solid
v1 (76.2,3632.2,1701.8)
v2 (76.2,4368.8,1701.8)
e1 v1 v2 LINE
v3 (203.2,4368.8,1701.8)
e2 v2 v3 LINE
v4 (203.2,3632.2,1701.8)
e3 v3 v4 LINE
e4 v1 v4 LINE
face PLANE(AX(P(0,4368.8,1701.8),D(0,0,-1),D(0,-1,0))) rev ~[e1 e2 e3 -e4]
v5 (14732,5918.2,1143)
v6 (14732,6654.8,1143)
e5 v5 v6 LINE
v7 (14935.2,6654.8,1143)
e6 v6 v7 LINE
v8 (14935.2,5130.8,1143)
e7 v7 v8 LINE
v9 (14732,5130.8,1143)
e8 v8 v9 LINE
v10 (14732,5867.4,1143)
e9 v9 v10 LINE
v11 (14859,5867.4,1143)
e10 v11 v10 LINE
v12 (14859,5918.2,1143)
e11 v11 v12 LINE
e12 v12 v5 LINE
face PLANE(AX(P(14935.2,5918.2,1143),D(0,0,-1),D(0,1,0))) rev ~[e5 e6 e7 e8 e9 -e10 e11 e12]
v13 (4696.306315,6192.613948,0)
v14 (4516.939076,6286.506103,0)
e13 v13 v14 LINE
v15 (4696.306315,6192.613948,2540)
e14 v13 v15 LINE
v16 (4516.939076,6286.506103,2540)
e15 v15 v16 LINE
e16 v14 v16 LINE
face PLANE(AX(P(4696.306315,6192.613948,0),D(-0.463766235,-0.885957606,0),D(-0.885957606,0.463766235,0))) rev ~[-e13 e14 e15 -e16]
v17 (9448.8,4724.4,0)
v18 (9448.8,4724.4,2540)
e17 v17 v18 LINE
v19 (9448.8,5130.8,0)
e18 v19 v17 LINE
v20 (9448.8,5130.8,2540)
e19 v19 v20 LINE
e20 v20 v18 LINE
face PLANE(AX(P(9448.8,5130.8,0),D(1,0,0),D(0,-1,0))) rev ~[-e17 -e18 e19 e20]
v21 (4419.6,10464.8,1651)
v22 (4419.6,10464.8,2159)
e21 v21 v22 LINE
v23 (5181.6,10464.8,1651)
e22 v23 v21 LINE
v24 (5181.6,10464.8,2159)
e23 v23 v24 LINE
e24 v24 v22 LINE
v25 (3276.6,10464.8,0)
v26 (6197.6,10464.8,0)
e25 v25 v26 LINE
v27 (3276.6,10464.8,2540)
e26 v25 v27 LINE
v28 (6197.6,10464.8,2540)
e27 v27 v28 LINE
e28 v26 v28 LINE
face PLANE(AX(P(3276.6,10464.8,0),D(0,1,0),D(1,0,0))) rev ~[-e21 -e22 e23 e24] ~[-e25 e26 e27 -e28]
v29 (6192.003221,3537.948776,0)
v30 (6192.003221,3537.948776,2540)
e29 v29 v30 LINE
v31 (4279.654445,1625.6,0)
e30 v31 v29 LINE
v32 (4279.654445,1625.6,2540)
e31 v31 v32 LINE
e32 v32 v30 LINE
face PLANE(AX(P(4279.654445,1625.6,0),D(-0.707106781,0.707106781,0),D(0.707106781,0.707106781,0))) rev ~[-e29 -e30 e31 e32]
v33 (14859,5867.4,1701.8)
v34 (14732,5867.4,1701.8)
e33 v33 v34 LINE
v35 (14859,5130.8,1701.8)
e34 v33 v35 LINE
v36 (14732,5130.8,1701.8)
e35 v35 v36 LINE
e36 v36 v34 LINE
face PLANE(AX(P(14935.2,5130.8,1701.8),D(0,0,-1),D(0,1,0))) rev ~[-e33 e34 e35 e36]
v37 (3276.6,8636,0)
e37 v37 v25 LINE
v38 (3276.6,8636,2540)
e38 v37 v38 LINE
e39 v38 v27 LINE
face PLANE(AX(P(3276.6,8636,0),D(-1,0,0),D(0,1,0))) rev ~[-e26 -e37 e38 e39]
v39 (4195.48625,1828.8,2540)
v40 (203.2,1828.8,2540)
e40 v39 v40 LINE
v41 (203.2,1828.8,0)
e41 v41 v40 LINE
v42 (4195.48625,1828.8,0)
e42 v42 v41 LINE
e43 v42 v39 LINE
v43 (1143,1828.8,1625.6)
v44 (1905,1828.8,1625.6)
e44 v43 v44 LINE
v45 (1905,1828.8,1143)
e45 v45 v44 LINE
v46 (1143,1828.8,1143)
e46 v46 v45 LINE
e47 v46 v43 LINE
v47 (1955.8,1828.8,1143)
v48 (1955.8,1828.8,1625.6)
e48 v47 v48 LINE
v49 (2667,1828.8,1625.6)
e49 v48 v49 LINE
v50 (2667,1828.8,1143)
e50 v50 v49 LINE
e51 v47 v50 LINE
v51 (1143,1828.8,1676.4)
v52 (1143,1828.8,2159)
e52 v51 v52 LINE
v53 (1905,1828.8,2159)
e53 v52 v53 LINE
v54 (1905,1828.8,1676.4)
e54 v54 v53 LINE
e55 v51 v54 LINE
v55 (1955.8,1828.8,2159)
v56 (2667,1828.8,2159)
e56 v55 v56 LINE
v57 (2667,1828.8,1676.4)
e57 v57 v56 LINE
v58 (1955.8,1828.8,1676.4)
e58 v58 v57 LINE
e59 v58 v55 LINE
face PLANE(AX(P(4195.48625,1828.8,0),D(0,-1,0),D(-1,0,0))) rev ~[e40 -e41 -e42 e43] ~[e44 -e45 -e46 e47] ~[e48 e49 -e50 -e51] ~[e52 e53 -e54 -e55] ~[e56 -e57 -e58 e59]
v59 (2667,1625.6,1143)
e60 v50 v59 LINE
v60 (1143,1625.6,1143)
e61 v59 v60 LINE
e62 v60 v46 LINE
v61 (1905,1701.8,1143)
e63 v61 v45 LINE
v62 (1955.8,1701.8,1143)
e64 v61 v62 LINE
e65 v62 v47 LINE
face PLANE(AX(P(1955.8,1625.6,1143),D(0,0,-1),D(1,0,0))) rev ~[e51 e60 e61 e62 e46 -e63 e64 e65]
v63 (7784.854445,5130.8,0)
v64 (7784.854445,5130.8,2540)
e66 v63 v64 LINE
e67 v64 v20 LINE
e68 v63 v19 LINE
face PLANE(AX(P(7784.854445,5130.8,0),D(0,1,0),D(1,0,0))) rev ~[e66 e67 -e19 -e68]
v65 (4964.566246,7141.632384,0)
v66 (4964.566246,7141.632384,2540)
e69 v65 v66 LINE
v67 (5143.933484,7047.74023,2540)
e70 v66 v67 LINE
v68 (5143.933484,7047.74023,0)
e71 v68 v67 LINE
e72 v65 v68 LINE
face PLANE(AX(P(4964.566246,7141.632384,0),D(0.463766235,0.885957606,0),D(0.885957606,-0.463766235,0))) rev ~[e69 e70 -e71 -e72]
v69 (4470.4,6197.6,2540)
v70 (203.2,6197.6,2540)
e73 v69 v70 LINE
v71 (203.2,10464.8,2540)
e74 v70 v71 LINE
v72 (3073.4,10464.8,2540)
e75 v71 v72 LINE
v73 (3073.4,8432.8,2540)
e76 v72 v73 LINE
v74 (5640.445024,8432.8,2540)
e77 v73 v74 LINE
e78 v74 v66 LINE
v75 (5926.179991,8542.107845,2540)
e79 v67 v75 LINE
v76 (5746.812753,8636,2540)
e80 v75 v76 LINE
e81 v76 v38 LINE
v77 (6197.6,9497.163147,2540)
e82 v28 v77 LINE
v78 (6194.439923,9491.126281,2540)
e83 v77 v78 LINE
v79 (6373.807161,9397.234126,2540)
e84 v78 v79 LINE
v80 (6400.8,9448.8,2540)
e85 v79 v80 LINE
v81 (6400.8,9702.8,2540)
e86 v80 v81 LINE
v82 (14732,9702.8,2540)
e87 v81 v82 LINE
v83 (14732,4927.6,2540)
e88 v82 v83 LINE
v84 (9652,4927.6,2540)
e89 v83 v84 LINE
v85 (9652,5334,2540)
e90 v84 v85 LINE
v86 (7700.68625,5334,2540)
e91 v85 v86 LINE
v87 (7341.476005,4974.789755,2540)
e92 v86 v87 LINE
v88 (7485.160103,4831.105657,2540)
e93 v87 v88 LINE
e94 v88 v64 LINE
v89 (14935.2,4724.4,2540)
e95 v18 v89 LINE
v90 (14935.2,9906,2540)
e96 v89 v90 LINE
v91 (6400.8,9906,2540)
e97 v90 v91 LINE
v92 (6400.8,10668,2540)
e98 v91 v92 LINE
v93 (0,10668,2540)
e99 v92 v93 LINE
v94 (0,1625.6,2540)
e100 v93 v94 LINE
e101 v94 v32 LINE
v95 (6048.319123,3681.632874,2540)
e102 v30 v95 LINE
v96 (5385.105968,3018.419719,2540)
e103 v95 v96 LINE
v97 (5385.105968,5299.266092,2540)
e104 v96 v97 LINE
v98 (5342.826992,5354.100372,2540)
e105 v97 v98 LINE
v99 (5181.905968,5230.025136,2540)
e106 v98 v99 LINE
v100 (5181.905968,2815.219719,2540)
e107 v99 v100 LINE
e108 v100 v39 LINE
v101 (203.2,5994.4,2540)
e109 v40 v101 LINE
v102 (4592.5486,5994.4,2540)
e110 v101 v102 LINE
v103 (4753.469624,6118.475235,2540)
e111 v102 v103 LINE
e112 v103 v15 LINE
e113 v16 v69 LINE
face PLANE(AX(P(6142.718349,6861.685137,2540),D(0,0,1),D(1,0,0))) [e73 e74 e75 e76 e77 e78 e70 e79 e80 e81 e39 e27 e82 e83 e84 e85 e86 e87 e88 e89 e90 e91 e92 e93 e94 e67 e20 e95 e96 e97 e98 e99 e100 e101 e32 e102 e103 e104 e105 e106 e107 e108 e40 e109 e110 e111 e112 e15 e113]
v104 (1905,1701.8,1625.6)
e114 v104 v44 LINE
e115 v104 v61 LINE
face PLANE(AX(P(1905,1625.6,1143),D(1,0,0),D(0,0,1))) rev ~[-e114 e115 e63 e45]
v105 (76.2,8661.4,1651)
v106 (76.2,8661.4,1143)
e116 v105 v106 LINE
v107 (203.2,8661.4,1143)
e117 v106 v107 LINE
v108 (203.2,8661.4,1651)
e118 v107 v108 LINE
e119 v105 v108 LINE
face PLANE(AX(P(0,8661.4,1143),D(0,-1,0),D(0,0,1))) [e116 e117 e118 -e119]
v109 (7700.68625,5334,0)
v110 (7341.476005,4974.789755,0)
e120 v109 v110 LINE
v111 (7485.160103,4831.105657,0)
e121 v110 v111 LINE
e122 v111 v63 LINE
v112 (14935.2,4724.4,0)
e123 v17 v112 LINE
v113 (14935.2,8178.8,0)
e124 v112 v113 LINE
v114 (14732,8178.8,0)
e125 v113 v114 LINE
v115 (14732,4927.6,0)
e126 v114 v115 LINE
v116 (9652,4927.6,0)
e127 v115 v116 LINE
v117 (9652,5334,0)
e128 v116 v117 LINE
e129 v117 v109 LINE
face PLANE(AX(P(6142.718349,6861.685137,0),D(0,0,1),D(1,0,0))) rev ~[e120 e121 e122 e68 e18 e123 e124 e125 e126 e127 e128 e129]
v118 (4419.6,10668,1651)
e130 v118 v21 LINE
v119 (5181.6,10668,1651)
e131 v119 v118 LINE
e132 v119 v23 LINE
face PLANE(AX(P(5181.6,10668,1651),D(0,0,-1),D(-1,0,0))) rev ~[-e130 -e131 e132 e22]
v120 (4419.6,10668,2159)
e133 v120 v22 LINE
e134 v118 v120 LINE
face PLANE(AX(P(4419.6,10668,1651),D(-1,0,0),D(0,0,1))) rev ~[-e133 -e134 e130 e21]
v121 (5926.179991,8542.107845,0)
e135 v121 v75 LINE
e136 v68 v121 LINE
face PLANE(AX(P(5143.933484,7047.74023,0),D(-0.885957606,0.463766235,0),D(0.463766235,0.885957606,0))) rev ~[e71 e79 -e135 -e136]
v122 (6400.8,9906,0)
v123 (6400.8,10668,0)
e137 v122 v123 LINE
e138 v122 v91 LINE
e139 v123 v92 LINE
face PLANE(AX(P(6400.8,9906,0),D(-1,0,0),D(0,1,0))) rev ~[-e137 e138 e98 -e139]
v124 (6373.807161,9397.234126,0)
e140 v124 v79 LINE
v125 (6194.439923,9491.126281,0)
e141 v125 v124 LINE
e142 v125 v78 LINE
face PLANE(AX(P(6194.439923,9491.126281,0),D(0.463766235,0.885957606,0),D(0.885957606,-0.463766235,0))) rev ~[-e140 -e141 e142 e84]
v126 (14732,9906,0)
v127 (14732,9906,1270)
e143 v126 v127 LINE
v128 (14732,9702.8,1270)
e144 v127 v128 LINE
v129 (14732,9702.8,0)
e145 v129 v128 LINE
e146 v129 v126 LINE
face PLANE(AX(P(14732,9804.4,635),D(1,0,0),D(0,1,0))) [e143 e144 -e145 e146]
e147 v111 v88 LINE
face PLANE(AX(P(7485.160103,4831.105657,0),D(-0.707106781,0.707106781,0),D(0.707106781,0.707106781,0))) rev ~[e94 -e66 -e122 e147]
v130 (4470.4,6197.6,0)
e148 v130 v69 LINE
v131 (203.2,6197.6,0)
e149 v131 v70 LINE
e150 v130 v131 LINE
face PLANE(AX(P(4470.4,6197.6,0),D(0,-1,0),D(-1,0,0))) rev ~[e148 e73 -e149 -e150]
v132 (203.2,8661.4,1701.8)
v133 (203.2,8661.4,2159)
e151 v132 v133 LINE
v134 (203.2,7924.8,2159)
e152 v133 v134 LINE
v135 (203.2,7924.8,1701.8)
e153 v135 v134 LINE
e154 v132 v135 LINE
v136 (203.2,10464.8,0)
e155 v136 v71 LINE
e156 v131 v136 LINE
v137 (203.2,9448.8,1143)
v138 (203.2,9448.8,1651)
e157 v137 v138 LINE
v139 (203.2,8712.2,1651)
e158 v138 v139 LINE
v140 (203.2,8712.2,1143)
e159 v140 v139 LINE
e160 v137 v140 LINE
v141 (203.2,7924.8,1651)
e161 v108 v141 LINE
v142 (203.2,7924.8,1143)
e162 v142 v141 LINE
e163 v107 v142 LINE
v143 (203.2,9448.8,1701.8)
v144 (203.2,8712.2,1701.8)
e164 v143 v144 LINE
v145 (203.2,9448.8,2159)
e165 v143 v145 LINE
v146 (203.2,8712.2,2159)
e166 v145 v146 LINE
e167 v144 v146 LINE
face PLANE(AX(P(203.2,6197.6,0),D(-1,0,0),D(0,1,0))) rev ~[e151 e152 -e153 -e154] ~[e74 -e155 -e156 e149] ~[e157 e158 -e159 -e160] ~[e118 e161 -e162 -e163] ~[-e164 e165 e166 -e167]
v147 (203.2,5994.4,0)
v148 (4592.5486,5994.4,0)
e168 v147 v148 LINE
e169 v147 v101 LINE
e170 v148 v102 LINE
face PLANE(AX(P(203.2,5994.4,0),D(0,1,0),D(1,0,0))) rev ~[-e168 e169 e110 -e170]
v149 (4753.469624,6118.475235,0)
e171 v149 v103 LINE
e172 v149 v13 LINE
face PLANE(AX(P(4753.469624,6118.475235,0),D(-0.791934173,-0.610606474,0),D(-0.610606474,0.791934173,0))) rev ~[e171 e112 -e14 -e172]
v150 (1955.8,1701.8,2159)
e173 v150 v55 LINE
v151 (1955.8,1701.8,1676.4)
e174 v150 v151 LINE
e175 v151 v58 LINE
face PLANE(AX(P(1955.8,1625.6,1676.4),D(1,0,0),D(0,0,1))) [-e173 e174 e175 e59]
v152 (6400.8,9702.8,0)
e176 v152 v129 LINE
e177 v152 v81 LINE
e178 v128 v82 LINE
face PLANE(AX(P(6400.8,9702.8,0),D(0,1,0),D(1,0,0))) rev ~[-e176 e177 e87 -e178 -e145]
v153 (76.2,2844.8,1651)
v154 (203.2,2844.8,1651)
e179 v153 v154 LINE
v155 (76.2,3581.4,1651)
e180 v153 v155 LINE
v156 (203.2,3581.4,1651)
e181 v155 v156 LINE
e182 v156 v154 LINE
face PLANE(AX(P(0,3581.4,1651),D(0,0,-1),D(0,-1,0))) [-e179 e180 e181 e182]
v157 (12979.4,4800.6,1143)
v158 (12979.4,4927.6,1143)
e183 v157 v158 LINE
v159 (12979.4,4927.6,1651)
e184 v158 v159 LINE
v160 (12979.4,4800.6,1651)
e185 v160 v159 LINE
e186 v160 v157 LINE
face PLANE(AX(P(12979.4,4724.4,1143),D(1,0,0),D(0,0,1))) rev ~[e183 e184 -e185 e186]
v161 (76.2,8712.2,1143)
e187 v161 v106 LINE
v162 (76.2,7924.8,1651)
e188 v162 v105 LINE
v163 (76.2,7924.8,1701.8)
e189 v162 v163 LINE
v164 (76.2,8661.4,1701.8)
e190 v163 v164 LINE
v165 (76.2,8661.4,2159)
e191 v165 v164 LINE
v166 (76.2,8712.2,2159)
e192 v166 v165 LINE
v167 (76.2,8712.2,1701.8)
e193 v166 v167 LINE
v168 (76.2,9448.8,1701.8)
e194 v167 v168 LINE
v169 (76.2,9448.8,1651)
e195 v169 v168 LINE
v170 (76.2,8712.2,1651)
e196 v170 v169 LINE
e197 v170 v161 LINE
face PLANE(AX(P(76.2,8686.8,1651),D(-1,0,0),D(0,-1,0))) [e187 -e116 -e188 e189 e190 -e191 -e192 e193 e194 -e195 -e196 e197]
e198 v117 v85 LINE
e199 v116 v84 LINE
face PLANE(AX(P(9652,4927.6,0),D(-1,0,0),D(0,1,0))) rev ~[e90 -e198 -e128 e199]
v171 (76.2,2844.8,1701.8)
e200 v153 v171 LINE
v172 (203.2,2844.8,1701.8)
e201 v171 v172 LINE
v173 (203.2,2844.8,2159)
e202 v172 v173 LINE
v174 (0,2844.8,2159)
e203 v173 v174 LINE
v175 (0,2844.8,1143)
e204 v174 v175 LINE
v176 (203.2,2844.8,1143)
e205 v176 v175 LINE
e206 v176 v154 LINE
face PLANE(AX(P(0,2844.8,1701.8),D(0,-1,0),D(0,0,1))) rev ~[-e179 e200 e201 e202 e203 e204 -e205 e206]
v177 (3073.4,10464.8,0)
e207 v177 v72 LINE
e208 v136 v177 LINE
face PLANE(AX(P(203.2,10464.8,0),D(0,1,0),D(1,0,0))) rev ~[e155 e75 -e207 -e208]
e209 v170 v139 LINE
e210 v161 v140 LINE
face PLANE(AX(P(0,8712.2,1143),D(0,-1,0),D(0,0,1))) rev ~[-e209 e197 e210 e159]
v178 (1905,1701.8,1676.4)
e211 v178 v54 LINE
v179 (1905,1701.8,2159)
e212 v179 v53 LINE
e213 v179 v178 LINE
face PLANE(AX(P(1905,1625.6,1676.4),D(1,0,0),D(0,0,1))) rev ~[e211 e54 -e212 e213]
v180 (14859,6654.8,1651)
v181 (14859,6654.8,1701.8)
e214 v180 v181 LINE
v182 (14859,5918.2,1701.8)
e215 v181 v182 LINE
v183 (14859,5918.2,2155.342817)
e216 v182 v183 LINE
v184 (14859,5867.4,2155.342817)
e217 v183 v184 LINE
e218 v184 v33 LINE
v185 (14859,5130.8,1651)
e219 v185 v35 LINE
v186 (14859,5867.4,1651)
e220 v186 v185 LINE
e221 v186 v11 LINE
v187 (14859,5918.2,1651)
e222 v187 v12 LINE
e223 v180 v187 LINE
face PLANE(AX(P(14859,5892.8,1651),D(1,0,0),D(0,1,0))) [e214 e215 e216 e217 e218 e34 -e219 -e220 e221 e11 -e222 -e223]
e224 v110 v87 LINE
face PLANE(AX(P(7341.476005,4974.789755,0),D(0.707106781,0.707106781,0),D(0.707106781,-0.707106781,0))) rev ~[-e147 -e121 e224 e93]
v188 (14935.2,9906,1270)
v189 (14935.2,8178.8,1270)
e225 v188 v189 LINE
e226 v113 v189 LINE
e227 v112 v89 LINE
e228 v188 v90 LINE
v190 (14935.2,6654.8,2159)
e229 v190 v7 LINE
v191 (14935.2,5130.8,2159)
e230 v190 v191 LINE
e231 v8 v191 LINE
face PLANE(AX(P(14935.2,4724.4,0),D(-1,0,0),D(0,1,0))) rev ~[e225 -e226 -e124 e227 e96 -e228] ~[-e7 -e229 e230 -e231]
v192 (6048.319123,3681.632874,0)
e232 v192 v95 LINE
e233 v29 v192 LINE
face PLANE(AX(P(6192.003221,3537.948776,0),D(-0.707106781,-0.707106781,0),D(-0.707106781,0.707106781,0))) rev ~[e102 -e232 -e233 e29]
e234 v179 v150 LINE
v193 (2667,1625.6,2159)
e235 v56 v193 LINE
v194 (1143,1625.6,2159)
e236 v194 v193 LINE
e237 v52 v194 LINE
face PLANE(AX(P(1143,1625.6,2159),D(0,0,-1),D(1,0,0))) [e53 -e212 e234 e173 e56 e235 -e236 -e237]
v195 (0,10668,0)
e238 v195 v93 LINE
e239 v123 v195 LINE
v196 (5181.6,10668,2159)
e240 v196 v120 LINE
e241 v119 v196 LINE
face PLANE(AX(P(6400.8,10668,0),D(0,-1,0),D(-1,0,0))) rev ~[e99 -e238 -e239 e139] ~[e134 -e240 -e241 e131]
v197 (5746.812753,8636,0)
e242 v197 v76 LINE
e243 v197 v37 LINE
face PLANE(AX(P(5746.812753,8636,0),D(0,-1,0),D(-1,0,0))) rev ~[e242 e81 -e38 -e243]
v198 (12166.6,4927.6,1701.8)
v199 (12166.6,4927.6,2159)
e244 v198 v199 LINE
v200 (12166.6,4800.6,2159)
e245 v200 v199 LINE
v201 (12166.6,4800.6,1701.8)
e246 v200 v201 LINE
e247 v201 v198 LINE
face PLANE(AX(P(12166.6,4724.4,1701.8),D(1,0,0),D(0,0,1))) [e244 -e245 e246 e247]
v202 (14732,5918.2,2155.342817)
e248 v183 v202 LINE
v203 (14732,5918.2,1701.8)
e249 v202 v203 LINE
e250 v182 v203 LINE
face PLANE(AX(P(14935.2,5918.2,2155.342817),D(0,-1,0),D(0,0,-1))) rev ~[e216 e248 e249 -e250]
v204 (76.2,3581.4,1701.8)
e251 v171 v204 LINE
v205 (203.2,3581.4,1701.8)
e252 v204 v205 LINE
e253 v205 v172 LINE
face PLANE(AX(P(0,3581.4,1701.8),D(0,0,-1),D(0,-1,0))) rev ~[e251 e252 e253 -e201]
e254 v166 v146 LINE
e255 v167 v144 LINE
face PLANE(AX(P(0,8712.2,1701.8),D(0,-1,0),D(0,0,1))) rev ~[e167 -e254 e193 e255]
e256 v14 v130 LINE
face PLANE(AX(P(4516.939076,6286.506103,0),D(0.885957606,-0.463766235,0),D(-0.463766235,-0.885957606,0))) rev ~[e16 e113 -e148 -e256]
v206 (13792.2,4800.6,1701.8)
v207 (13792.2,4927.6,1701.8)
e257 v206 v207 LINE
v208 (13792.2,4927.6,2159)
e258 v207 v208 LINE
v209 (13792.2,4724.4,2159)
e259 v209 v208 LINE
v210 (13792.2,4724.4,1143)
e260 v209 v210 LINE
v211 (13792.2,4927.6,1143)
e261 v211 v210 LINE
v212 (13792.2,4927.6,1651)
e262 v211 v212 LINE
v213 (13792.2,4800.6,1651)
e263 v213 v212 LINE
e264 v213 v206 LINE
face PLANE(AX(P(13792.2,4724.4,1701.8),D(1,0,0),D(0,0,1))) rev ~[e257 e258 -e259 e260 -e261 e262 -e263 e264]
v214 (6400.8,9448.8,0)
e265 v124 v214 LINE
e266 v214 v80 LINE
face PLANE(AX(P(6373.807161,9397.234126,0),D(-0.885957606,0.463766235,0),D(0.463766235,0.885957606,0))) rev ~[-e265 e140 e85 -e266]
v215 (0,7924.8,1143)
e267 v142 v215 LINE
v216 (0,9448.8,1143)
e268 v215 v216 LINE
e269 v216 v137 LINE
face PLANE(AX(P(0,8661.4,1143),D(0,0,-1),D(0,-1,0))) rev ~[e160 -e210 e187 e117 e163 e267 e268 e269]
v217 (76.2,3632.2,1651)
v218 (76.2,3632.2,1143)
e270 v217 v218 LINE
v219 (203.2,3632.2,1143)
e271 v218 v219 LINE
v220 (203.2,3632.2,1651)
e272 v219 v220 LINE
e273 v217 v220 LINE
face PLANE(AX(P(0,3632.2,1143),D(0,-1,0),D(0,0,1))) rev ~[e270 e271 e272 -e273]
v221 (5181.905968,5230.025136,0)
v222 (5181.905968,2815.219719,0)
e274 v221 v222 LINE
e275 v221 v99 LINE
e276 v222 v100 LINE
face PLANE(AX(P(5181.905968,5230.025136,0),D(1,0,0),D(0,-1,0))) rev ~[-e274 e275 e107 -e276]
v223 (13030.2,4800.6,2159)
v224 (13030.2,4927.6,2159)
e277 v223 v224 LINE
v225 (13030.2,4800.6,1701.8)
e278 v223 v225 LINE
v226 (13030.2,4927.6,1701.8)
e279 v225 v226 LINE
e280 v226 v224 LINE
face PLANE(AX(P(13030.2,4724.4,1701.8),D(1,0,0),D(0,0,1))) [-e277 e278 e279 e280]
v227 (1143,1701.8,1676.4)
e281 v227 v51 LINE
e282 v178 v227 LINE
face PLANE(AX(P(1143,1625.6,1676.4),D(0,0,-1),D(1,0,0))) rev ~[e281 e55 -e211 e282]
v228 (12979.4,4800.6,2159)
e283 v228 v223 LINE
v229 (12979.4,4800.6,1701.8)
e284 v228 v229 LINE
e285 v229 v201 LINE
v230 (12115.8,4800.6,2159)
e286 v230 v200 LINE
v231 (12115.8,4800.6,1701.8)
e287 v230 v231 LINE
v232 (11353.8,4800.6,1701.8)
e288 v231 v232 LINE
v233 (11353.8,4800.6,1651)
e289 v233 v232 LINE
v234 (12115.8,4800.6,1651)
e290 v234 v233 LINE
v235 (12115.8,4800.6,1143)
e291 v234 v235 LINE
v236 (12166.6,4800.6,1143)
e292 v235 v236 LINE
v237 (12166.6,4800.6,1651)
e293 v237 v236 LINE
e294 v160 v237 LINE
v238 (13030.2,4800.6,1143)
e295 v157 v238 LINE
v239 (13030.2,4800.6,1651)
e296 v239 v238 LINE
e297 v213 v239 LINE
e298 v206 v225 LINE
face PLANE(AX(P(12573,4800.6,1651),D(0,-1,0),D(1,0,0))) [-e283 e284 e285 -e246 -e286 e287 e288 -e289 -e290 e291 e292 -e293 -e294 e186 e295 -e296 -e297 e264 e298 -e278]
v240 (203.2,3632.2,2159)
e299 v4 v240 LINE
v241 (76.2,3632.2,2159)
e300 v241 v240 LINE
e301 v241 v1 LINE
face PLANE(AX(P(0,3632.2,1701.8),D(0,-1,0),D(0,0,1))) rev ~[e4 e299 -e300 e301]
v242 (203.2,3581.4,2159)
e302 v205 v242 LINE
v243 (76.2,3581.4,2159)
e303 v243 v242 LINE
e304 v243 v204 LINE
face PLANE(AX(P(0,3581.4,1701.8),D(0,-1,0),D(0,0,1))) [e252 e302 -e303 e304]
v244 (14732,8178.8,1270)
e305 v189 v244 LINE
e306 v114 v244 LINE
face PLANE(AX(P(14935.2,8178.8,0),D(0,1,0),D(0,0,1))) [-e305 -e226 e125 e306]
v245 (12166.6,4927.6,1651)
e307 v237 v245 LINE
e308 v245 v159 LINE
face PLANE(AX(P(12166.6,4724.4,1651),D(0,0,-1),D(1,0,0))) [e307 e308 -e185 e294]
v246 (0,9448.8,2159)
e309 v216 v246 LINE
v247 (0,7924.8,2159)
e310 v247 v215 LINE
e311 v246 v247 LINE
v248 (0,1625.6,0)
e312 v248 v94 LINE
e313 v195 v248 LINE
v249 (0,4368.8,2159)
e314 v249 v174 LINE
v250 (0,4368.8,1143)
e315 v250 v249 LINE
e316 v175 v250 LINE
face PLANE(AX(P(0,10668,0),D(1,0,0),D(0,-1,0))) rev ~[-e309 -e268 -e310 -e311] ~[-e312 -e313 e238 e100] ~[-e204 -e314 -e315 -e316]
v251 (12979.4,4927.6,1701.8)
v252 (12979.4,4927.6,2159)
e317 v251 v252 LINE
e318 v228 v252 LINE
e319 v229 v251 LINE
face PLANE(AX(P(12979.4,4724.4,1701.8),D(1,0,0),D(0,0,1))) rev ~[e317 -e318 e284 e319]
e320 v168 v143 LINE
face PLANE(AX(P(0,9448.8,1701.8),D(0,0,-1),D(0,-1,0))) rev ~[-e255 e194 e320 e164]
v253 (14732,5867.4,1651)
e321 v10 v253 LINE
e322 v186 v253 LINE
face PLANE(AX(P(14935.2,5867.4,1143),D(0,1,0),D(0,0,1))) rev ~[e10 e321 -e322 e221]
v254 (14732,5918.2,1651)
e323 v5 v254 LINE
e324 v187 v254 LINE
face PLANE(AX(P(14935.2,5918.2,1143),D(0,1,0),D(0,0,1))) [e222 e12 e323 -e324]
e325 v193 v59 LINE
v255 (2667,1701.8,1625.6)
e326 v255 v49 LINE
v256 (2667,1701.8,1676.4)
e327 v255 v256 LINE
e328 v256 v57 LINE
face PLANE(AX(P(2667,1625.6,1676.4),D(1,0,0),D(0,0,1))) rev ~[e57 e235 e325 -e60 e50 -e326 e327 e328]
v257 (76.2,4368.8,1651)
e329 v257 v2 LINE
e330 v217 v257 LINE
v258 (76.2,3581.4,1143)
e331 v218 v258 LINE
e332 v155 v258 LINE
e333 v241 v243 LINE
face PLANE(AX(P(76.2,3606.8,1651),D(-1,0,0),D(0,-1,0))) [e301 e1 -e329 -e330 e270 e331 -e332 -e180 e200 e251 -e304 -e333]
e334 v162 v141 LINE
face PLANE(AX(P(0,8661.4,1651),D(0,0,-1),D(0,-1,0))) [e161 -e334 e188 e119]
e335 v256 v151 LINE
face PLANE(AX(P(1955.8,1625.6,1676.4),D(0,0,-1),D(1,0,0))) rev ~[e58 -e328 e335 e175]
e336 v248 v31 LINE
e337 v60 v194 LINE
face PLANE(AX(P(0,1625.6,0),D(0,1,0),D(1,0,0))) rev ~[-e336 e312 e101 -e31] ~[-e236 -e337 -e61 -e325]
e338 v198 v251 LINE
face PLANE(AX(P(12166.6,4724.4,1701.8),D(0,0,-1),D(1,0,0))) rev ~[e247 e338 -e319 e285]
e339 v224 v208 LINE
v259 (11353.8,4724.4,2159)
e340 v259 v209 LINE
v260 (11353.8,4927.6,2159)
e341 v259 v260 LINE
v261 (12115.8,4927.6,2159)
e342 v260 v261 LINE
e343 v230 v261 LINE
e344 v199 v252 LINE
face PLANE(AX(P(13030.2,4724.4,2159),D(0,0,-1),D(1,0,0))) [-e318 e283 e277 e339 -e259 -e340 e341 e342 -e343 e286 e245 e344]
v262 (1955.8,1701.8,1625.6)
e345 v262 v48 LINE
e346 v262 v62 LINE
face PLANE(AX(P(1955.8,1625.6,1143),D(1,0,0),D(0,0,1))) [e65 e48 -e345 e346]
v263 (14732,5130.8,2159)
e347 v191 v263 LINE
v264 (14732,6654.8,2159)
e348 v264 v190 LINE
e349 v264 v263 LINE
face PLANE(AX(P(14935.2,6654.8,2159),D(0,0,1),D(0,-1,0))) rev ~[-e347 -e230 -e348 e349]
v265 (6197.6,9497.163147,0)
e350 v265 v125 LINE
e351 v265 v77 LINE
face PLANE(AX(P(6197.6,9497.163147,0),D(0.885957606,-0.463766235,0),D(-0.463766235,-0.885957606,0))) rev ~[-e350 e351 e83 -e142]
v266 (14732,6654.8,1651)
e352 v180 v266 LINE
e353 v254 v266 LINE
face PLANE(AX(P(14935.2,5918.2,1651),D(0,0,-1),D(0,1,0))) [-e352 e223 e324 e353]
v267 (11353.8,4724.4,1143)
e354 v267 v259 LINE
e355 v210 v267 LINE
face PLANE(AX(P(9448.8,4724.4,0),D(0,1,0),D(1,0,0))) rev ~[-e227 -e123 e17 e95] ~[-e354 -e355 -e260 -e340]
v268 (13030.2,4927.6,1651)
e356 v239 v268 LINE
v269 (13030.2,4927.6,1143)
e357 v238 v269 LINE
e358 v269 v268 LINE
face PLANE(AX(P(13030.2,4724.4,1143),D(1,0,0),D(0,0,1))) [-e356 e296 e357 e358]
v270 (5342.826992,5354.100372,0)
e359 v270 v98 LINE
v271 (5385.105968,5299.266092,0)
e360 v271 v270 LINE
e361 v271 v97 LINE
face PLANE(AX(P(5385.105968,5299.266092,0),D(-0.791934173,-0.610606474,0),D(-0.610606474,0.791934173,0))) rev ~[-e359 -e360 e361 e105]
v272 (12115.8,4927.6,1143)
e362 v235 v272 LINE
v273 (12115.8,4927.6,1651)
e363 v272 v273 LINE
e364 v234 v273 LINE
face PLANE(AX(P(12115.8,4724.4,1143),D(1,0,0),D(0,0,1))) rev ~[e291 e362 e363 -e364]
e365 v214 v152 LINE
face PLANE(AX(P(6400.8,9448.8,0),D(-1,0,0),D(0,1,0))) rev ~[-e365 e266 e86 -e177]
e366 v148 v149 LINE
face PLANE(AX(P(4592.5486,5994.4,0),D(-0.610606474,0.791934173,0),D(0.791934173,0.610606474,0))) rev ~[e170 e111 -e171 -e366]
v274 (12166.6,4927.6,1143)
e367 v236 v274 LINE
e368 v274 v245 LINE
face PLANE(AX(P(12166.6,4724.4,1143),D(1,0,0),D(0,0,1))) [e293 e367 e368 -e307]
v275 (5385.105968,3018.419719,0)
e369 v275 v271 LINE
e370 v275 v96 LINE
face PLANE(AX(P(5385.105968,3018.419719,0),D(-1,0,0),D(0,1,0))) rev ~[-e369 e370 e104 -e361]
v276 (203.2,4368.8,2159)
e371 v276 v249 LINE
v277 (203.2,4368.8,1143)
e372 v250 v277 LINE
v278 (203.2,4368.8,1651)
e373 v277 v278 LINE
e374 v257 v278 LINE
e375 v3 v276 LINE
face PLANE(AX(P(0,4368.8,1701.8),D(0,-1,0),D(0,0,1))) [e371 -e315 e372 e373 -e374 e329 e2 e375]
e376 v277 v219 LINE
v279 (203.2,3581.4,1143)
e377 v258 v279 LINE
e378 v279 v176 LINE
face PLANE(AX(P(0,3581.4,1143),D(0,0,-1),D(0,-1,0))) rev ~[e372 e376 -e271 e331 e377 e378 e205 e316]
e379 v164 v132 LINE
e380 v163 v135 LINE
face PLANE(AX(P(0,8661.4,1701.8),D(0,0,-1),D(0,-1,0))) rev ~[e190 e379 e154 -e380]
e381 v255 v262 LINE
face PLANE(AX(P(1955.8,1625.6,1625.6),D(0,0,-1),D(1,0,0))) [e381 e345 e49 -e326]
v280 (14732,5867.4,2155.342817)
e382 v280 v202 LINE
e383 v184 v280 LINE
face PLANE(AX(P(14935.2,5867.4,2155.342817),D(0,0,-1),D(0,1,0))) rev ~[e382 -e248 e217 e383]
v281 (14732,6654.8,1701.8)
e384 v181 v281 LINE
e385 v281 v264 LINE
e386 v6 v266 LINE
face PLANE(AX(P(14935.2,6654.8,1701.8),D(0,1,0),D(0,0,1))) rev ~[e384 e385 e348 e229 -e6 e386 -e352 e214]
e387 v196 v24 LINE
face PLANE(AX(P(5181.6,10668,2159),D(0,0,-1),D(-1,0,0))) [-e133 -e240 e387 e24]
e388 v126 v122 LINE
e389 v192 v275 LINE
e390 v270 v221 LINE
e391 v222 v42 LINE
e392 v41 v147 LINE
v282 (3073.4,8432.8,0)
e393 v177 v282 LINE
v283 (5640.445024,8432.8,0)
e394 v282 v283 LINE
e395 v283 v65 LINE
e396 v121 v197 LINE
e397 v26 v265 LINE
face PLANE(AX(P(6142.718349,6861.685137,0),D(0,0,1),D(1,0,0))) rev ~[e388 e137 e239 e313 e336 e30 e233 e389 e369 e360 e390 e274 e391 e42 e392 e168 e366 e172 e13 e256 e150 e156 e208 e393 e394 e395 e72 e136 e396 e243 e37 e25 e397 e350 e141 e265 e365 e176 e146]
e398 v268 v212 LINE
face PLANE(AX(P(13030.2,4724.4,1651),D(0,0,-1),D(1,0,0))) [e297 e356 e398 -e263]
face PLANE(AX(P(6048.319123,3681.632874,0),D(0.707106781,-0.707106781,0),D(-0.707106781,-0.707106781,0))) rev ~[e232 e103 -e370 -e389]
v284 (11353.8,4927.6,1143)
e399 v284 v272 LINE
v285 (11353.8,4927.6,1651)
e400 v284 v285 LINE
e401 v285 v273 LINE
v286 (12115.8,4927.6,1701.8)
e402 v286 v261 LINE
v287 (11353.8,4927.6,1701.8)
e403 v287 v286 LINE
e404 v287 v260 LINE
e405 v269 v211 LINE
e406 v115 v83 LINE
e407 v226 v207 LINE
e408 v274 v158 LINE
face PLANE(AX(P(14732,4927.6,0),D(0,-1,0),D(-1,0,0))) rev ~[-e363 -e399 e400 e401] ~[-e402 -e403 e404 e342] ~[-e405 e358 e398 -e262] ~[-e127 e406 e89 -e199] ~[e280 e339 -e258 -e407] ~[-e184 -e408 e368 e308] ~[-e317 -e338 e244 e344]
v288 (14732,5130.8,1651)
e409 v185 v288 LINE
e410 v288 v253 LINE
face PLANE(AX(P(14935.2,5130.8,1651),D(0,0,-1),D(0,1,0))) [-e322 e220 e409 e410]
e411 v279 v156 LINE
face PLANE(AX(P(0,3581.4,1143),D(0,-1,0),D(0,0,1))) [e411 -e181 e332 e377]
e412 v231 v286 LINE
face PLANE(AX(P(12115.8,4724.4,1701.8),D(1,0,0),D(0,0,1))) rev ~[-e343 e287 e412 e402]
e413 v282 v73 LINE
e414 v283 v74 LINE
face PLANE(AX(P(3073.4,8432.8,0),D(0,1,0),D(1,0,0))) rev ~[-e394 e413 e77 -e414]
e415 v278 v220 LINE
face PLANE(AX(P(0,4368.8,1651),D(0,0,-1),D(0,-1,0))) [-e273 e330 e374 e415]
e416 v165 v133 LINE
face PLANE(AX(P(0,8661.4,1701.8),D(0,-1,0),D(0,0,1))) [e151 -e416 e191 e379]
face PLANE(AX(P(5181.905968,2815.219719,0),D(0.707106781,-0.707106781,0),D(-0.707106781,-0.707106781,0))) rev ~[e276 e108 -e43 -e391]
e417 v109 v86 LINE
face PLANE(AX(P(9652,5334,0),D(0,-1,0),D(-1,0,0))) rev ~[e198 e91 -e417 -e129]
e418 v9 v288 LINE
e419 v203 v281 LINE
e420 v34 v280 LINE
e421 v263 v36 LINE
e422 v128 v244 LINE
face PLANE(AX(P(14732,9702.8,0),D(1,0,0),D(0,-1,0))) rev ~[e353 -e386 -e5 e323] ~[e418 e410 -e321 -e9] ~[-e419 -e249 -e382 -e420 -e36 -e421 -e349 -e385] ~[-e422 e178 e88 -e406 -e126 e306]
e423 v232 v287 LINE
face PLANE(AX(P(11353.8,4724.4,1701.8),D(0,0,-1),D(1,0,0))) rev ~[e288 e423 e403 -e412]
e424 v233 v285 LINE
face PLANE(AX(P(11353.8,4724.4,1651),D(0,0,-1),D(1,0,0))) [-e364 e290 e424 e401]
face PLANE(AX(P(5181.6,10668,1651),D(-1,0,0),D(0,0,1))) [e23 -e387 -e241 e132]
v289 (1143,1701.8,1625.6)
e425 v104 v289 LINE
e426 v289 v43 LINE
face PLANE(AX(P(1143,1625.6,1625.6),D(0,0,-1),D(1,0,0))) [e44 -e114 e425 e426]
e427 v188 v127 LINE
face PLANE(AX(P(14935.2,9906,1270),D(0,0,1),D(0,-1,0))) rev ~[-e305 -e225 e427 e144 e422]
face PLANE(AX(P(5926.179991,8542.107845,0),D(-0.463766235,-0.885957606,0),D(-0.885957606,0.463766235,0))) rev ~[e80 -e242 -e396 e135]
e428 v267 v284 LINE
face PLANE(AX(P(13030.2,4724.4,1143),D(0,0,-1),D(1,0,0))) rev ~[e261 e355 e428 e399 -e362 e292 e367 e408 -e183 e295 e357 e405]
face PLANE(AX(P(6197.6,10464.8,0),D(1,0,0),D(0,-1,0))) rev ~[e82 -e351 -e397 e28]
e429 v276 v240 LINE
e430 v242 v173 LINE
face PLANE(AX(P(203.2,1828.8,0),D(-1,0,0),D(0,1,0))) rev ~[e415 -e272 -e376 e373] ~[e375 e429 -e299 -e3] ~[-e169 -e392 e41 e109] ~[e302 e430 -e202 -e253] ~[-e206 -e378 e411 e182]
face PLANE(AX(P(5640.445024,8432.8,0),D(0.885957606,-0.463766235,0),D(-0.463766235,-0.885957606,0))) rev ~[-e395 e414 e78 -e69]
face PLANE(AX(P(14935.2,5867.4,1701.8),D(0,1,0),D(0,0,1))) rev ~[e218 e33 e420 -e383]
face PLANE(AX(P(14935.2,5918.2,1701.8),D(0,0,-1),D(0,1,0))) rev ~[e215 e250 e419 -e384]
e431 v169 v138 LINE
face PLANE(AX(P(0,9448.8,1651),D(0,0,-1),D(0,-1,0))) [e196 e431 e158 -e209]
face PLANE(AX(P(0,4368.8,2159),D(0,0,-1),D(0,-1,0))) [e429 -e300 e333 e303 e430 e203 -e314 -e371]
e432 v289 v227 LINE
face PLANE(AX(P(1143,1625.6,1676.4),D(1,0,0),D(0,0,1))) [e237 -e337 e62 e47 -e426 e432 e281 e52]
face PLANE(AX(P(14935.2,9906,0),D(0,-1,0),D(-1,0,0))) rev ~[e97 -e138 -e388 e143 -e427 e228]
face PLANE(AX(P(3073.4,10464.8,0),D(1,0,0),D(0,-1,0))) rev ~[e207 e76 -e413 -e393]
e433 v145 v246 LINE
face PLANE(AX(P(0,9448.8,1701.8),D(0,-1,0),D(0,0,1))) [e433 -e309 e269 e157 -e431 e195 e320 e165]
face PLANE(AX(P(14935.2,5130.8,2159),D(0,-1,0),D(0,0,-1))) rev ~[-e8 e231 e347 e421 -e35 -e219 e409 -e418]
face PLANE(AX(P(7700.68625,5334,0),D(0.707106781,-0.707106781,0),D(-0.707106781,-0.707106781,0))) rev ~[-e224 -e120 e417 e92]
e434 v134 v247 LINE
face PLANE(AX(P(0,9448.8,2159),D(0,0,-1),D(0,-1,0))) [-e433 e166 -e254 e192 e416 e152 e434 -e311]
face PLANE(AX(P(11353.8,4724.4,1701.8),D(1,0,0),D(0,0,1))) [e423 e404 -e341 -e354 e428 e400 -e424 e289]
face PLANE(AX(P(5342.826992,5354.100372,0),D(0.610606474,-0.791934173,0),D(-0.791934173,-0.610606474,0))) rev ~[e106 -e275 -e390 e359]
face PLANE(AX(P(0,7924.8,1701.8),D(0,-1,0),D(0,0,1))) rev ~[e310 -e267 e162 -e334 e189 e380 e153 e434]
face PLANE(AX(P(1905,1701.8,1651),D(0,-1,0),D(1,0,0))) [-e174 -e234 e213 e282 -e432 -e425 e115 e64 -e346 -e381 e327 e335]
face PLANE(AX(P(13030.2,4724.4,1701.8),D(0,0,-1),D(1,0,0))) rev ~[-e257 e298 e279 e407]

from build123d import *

# Parameters (mm, degrees)
F1_DEPTH  = 2540
F2_W      = 736.6
F2_H      = 457.2
F2_H_2    = 508
F3_DEPTH  = 203.2
F4_W      = 1524
F4_H      = 1016
F5_DEPTH  = 76.2
F6_W      = 762
F6_H      = 482.6
F6_W_2    = 711.2
F7_DEPTH  = 203.2
F8_W      = 1524
F8_H      = 1016
F9_DEPTH  = 76.2
F10_W     = 762
F10_H     = 457.2
F10_W_2   = 812.8
F10_H_2   = 508
F11_DEPTH = 203.2
F12_W     = 2438.4
F12_H     = 1016
F13_DEPTH = 76.2
F14_W     = 762
F14_H     = 508
F15_DEPTH = 203.2
F16_W     = 203.2
F16_H     = 1270
F16_W_2   = 1524
F17_DEPTH = 203.2
F18_W     = 736.6
F18_H     = 508
F19_DEPTH = 203.2
F20_W     = 1524
F20_H     = 1016
F21_DEPTH = 76.2


# Not quite as in the source:
# - ends of sketch curves that miss each other by under 0.0002 mm in the source are joined


with BuildPart() as f1:
    # F0 (on Top) → F1 (new body)
    with BuildSketch(Plane.XY):
        Polygon((0, 10668), (0, 1625.6), (4279.6544454742, 1625.6), (6192.0032212604, 3537.9487757862), (6048.3191233233, 3681.6328737233), (5385.1059684, 3018.4197188), (5385.1059684, 5299.2660923905), (5342.8269923446, 5354.1003717159), (5181.9059684, 5230.0251362632), (5181.9059684, 2815.2197188), (4195.4862496, 1828.8), (2071.3068791001, 1828.8), (203.2, 1828.8), (203.2, 5994.4), (4592.5486, 5994.4), (4753.4696239446, 6118.4752354526), (4696.3063146823, 6192.6139483473), (4516.9390764162, 6286.5061031958), (4470.4, 6197.6), (203.2, 6197.6), (203.2, 10464.8), (3073.4, 10464.8), (3073.4, 8432.8), (5640.4450235294, 8432.8), (4964.5662461846, 7141.6323844462), (5143.9334844506, 7047.7402295977), (5926.1799912072, 8542.1078451515), (5746.8127529412, 8636), (3276.6, 8636), (3276.6, 10464.8), (6197.6, 10464.8), (6197.6, 9702.8), (6197.6, 9497.163147027), (6194.4399227095, 9491.1262812504), (6373.8071609756, 9397.2341264019), (6400.8, 9448.8), (6400.8, 9702.8), (14732, 9702.8), (14732, 4927.6), (9652, 4927.6), (9652, 5334), (7700.6862496, 5334), (7341.4760047572, 4974.7897551572), (7485.1601026943, 4831.1056572201), (7784.8544454742, 5130.8), (9448.8, 5130.8), (9448.8, 4724.4), (14935.2, 4724.4), (14935.2, 9906), (6400.8, 9906), (6400.8, 10668), align=None)
    extrude(amount=F1_DEPTH)

    # F2 (on face) → F3 (cut)
    with BuildSketch(Plane(origin=(0, 0, 0), x_dir=(0, -1, 0), z_dir=(-1, 0, 0))):
        with Locations((-9080.5, 1930.4)):
            Rectangle(F2_W, F2_H)
        with Locations((-8293.1, 1930.4)):
            Rectangle(F2_W, F2_H)
        with Locations((-9080.5, 1397)):
            Rectangle(F2_W, F2_H_2)
        with Locations((-8293.1, 1397)):
            Rectangle(F2_W, F2_H_2)
        with Locations((-4000.5, 1930.4)):
            Rectangle(F2_W, F2_H)
        with Locations((-3213.1, 1930.4)):
            Rectangle(F2_W, F2_H)
        with Locations((-4000.5, 1397)):
            Rectangle(F2_W, F2_H_2)
        with Locations((-3213.1, 1397)):
            Rectangle(F2_W, F2_H_2)
    extrude(amount=-F3_DEPTH, mode=Mode.SUBTRACT)

    # F4 (on face) → F5 (cut)
    with BuildSketch(Plane(origin=(0, 0, 0), x_dir=(0, -1, 0), z_dir=(-1, 0, 0))):
        with Locations((-8686.8, 1651)):
            Rectangle(F4_W, F4_H)
        with Locations((-3606.8, 1651)):
            Rectangle(F4_W, F4_H)
    extrude(amount=-F5_DEPTH, mode=Mode.SUBTRACT)

    # F6 (on face) → F7 (cut)
    with BuildSketch(Plane.XZ.offset(-1625.6)):
        with Locations((1524, 1917.7)):
            Rectangle(F6_W, F6_H)
        with Locations((2311.4, 1917.7)):
            Rectangle(F6_W_2, F6_H)
        with Locations((1524, 1384.3)):
            Rectangle(F6_W, F6_H)
        with Locations((2311.4, 1384.3)):
            Rectangle(F6_W_2, F6_H)
    extrude(amount=-F7_DEPTH, mode=Mode.SUBTRACT)

    # F8 (on face) → F9 (cut)
    with BuildSketch(Plane.XZ.offset(-1625.6)):
        with Locations((1905, 1651)):
            Rectangle(F8_W, F8_H)
    extrude(amount=-F9_DEPTH, mode=Mode.SUBTRACT)

    # F10 (on face) → F11 (cut)
    with BuildSketch(Plane.XZ.offset(-4724.4)):
        with Locations((11734.8, 1930.4)):
            Rectangle(F10_W, F10_H)
        with Locations((12573, 1930.4)):
            Rectangle(F10_W_2, F10_H)
        with Locations((13411.2, 1930.4)):
            Rectangle(F10_W, F10_H)
        with Locations((11734.8, 1397)):
            Rectangle(F10_W, F10_H_2)
        with Locations((12573, 1397)):
            Rectangle(F10_W_2, F10_H_2)
        with Locations((13411.2, 1397)):
            Rectangle(F10_W, F10_H_2)
    extrude(amount=-F11_DEPTH, mode=Mode.SUBTRACT)

    # F12 (on face) → F13 (cut)
    with BuildSketch(Plane.XZ.offset(-4724.4)):
        with Locations((12573, 1651)):
            Rectangle(F12_W, F12_H)
    extrude(amount=-F13_DEPTH, mode=Mode.SUBTRACT)

    # F14 (on face) → F15 (cut)
    with BuildSketch(Plane(origin=(0, 10668, 0), x_dir=(-1, 0, 0), z_dir=(0, 1, 0))):
        with Locations((-4800.6, 1905)):
            Rectangle(F14_W, F14_H)
    extrude(amount=-F15_DEPTH, mode=Mode.SUBTRACT)

    # F16 (on face) → F17 (cut)
    with BuildSketch(Plane.YZ.offset(14935.2)):
        with Locations((9804.4, 635)):
            Rectangle(F16_W, F16_H)
        with Locations((8940.8, 635)):
            Rectangle(F16_W_2, F16_H)
    extrude(amount=-F17_DEPTH, mode=Mode.SUBTRACT)

    # F18 (on face) → F19 (cut)
    with BuildSketch(Plane.YZ.offset(14935.2)):
        Polygon((6654.8, 2159), (5130.8, 2159), (5130.8, 1701.8), (5867.4, 1701.8), (5867.4, 2155.3428173065), (5918.2, 2155.3428173065), (5918.2, 1701.8), (6654.8, 1701.8), align=None)
        with Locations((5499.1, 1397)):
            Rectangle(F18_W, F18_H)
        with Locations((6286.5, 1397)):
            Rectangle(F18_W, F18_H)
    extrude(amount=-F19_DEPTH, mode=Mode.SUBTRACT)

    # F20 (on face) → F21 (cut)
    with BuildSketch(Plane.YZ.offset(14935.2)):
        with Locations((5892.8, 1651)):
            Rectangle(F20_W, F20_H)
    extrude(amount=-F21_DEPTH, mode=Mode.SUBTRACT)


solid = f1.part
